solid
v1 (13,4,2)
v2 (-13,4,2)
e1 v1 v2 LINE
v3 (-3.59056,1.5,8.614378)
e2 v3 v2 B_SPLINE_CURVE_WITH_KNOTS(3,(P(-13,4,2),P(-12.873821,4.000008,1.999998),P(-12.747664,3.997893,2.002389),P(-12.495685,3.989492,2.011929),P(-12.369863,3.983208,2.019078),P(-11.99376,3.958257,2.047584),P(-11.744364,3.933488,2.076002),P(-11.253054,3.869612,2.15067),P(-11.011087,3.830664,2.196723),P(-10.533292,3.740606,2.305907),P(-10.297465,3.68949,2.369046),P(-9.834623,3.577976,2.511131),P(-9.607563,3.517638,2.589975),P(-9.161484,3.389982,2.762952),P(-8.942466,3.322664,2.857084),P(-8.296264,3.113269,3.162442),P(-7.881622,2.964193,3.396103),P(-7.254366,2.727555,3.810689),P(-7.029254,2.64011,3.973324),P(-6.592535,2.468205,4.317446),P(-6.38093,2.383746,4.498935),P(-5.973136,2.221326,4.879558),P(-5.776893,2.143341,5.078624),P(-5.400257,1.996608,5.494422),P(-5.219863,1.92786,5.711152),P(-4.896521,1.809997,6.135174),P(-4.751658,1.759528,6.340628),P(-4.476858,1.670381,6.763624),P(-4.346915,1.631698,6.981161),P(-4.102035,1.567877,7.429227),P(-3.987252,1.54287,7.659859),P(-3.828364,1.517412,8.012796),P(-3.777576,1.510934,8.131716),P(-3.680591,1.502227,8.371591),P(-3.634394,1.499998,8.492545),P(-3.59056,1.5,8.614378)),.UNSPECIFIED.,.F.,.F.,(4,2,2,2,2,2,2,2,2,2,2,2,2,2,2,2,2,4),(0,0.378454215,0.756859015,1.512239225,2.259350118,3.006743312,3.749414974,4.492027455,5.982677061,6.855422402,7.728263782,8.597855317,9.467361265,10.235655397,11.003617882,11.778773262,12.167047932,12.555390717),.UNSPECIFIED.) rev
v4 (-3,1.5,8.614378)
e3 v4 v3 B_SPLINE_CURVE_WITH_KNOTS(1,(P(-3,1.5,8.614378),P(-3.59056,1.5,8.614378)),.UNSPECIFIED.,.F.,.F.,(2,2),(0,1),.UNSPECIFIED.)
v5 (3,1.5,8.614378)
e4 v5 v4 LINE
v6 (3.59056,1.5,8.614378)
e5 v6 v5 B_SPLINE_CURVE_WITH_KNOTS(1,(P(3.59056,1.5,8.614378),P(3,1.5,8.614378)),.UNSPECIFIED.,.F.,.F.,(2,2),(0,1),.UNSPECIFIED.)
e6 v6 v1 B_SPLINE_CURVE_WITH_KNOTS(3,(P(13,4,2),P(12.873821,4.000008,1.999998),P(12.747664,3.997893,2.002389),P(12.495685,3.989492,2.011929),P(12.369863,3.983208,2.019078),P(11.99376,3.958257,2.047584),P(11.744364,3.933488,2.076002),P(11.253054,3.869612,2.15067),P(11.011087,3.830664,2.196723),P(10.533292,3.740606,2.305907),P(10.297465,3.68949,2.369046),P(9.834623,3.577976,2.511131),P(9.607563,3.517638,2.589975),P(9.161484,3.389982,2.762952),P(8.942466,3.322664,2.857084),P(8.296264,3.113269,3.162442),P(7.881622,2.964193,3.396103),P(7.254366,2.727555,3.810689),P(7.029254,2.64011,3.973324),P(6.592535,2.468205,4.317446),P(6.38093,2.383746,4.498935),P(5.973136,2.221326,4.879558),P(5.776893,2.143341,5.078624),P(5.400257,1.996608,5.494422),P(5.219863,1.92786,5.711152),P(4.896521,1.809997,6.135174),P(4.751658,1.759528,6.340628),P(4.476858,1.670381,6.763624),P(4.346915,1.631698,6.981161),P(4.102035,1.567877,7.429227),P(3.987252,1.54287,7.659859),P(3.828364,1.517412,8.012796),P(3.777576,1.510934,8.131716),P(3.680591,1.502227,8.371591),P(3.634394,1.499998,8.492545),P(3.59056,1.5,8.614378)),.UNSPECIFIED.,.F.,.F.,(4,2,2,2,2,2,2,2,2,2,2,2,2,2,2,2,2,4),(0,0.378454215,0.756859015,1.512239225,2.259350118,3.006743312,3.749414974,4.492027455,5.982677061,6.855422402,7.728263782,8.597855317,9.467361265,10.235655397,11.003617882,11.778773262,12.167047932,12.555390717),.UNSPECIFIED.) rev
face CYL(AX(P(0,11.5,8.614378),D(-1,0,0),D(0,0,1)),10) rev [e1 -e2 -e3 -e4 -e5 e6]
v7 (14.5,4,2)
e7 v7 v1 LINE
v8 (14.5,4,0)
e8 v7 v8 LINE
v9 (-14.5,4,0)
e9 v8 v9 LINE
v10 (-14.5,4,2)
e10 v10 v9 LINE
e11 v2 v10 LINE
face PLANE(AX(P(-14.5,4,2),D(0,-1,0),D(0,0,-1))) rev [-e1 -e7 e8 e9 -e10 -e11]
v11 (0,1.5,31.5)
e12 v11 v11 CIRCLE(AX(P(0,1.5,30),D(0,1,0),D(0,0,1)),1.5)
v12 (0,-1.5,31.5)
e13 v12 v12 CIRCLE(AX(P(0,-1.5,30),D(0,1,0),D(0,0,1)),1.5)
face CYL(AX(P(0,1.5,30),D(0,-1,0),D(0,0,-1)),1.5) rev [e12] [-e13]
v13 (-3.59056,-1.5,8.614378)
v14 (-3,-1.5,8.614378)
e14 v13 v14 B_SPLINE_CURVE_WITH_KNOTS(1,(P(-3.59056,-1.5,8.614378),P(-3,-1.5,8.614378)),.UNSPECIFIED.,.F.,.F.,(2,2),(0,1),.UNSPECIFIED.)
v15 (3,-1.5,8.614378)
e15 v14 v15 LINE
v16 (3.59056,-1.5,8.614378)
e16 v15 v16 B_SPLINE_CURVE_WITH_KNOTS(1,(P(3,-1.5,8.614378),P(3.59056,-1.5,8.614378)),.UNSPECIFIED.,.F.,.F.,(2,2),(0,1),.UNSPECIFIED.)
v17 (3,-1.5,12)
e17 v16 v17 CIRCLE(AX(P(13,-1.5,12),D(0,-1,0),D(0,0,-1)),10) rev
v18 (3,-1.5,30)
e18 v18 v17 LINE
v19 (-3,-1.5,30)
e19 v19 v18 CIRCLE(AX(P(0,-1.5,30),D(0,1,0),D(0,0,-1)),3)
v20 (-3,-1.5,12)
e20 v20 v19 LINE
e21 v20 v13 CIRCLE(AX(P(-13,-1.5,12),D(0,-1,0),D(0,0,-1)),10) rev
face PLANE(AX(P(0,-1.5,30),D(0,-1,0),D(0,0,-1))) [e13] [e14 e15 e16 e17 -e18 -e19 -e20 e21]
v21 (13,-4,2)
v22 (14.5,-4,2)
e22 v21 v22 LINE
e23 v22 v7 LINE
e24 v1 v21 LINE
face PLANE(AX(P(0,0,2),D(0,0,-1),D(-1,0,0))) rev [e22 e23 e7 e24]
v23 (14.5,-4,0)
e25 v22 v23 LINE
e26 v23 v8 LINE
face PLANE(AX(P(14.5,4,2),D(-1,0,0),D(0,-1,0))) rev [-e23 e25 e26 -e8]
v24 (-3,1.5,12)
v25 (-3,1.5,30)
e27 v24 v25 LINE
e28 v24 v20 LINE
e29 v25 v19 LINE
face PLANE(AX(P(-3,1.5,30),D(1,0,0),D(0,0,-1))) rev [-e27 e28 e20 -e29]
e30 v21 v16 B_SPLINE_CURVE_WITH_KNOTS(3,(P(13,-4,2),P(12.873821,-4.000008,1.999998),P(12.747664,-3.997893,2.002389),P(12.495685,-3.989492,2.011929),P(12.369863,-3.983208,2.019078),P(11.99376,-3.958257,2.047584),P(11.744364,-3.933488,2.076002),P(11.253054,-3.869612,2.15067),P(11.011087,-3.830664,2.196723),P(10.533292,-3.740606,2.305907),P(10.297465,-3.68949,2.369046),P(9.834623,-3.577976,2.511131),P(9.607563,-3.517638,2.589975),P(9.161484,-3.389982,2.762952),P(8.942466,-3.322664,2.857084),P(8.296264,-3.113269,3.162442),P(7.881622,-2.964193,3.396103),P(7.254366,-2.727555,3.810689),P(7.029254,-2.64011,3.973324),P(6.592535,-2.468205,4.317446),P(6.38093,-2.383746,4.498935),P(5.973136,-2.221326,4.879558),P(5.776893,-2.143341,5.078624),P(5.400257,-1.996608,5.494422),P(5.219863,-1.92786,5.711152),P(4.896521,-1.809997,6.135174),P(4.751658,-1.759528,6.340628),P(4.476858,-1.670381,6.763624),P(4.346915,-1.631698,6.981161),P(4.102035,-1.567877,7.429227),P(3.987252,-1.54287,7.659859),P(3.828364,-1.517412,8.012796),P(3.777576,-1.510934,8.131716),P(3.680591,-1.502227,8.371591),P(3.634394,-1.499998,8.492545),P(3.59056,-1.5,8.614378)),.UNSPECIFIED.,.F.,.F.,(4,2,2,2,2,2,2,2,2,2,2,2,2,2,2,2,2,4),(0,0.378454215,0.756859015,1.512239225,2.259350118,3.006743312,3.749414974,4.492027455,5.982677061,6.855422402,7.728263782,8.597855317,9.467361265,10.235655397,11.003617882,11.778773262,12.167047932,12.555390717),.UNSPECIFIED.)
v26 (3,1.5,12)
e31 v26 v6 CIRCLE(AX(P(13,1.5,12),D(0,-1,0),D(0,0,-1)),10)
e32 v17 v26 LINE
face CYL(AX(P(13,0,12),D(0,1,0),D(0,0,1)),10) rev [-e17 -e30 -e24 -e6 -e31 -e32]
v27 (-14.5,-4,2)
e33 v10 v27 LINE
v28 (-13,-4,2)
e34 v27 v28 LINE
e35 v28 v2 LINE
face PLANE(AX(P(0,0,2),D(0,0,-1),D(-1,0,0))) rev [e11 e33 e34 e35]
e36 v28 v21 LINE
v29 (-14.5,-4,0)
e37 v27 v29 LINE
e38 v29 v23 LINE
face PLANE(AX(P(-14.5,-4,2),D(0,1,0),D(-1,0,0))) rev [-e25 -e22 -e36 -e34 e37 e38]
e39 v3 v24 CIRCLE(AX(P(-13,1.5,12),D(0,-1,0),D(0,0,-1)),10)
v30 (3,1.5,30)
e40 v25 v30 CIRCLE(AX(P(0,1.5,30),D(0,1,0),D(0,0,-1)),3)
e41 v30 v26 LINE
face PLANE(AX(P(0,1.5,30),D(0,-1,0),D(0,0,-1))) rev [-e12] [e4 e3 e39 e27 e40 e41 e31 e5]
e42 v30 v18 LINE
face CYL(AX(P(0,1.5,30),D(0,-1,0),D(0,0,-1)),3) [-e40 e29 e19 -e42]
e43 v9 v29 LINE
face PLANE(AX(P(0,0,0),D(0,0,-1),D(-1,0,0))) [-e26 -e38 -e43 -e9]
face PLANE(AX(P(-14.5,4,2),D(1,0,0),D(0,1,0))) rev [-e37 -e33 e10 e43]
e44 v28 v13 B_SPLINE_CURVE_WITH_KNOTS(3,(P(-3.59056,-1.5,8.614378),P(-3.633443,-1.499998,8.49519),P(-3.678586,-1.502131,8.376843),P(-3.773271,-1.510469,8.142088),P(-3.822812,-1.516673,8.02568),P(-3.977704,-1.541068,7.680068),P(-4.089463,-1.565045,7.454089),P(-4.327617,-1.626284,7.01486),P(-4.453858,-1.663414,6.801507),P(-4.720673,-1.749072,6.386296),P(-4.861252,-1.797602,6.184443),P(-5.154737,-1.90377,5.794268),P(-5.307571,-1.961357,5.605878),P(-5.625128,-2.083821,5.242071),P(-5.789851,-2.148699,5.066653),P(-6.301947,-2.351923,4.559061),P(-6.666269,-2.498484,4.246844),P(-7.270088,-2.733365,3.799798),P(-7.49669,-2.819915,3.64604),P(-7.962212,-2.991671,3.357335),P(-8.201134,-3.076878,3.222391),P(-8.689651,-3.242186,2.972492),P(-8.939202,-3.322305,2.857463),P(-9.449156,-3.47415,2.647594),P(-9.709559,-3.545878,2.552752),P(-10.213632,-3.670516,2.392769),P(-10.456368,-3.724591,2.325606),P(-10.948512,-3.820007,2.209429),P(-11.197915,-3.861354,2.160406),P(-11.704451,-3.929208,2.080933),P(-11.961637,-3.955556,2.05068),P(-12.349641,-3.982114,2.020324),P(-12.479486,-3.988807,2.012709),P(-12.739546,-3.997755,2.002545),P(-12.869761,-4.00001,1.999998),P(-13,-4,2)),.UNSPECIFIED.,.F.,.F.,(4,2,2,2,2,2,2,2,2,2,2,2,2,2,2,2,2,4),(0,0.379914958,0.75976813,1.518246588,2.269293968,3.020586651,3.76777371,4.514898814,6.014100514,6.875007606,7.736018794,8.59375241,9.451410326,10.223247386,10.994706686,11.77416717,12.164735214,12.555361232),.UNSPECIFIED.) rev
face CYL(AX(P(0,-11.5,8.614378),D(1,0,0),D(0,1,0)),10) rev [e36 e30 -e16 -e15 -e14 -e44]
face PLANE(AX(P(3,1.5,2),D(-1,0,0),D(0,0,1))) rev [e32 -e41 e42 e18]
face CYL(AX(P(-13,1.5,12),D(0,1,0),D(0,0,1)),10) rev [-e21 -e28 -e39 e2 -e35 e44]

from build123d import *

# Parameters (mm, degrees)
SKETCH1_W           = 29
SKETCH1_H           = 8
BOSS_EXTRUDE1_DEPTH = 2
SKETCH2_R           = 1.5
BOSS_EXTRUDE2_DEPTH = 1.5
FILLET1_R           = 10


with BuildPart() as part:
    # Sketch1 → Boss-Extrude1 (new body)
    with BuildSketch(Plane.XY):
        Rectangle(SKETCH1_W, SKETCH1_H)
    extrude(amount=BOSS_EXTRUDE1_DEPTH)

    # Sketch2 → Boss-Extrude2 (add, symmetric)
    with BuildSketch(Plane(origin=(0, 0, 0), x_dir=(1, 0, 0), z_dir=(0, 1, 0))):
        with BuildLine():
            Line((-3, -2), (3, -2))
            Line((3, -2), (3, -30))
            ThreePointArc((3, -30), (0, -33), (-3, -30))
            Line((-3, -30), (-3, -2))
        make_face()
        with Locations(Location((0, -30, 0), (0, 0, 270))):
            Circle(SKETCH2_R, mode=Mode.SUBTRACT)
    extrude(amount=BOSS_EXTRUDE2_DEPTH, both=True)

    # Fillet1
    # the kernel refuses this fillet: 10 mm, written as the material it adds along each edge
    with BuildSketch(Plane(origin=(-3, 1.5, 2), x_dir=(0, 1, 0), z_dir=(1, 0, 0))) as fillet1_piece_1:
        with BuildLine():
            CenterArc((10, 6.614378278), FILLET1_R, 180, 41.409622109)
            Line((0, 6.614378278), (-0.2, 6.614378278))
            Line((-0.2, 6.614378278), (-0.2, 0))
            Line((-0.2, 0), (0, -0.2))
            ThreePointArc((0, -0.2), (1.25, -0.2), (2.35, -0.132287566))
            Line((2.35, -0.132287566), (2.5, 0))
        make_face()
    extrude(amount=6)
    with BuildSketch(Plane(origin=(-3, -1.5, 2), x_dir=(-1, 0, 0), z_dir=(0, 1, 0)), Plane(origin=(3, 1.5, 2), x_dir=(1, 0, 0), z_dir=(0, -1, 0))) as fillet1_piece_2:
        with BuildLine():
            CenterArc((FILLET1_R, FILLET1_R), FILLET1_R, 180, 90)
            Line((0, FILLET1_R), (-FILLET1_R * 0.02, FILLET1_R))
            Line((-FILLET1_R * 0.02, FILLET1_R), (-FILLET1_R * 0.02, -FILLET1_R * 0.02))
            Line((-FILLET1_R * 0.02, -FILLET1_R * 0.02), (FILLET1_R, -FILLET1_R * 0.02))
            Line((FILLET1_R, -FILLET1_R * 0.02), (FILLET1_R, 0))
        make_face()
    extrude(amount=3)
    with BuildSketch(Plane(origin=(-3, -1.5, 2), x_dir=(0, -1, 0), z_dir=(1, 0, 0))) as fillet1_piece_3:
        with BuildLine():
            CenterArc((10, -6.614378278), FILLET1_R, 138.590377891, 41.409622109)
            Line((0, -6.614378278), (-0.2, -6.614378278))
            Line((-0.2, -6.614378278), (-0.2, 0))
            Line((-0.2, 0), (0, 0.2))
            ThreePointArc((0, 0.2), (1.25, 0.2), (2.35, 0.132287566))
            Line((2.35, 0.132287566), (2.5, 0))
        make_face()
    extrude(amount=6)
    with BuildSketch(Plane(origin=(-19.535945694, 1.5, 2), x_dir=(0, 1, 0), z_dir=(1, 0, 0))) as fillet1_piece_4a_section:
        with BuildLine():
            CenterArc((10, 6.614378278), FILLET1_R, 180, 41.409622109)
            Line((0, 6.614378278), (-0.2, 6.614378278))
            Line((-0.2, 6.614378278), (-0.2, 0))
            Line((-0.2, 0), (0, -0.2))
            ThreePointArc((0, -0.2), (1.25, -0.2), (2.35, -0.132287566))
            Line((2.35, -0.132287566), (2.5, 0))
        make_face()
    fillet1_piece_4a = extrude(amount=22.535945694, mode=Mode.PRIVATE)
    fillet1_piece_4a = split(fillet1_piece_4a, bisect_by=Plane(origin=(-14.5, 2.097749904, 3.814075663), z_dir=(1, 0, 0)), keep=Keep.TOP, mode=Mode.PRIVATE)
    fillet1_piece_4a = split(fillet1_piece_4a, bisect_by=Plane(origin=(-3, 2.097749904, 3.814075663), z_dir=(-1, 0, 0)), keep=Keep.TOP, mode=Mode.PRIVATE)
    with BuildSketch(Plane(origin=(-3, -1.5, 2), x_dir=(-1, 0, 0), z_dir=(0, 1, 0))) as fillet1_piece_4b_section:
        with BuildLine():
            CenterArc((FILLET1_R, FILLET1_R), FILLET1_R, 180, 90)
            Line((0, FILLET1_R), (-FILLET1_R * 0.02, FILLET1_R))
            Line((-FILLET1_R * 0.02, FILLET1_R), (-FILLET1_R * 0.02, -FILLET1_R * 0.02))
            Line((-FILLET1_R * 0.02, -FILLET1_R * 0.02), (FILLET1_R, -FILLET1_R * 0.02))
            Line((FILLET1_R, -FILLET1_R * 0.02), (FILLET1_R, 0))
        make_face()
    fillet1_piece_4b = extrude(amount=28, mode=Mode.PRIVATE)
    fillet1_piece_4b = split(fillet1_piece_4b, bisect_by=Plane(origin=(-5.263951143, 4, 4.263951143), z_dir=(0, -1, 0)), keep=Keep.TOP, mode=Mode.PRIVATE)
    fillet1_piece_4b = split(fillet1_piece_4b, bisect_by=Plane(origin=(-5.263951143, 1.5, 4.263951143), z_dir=(0, 1, 0)), keep=Keep.TOP, mode=Mode.PRIVATE)
    fillet1_piece_4 = fillet1_piece_4a & fillet1_piece_4b
    add(fillet1_piece_4)
    with BuildSketch(Plane(origin=(3, 26.5, 2), x_dir=(1, 0, 0), z_dir=(0, -1, 0))) as fillet1_piece_5a_section:
        with BuildLine():
            CenterArc((FILLET1_R, FILLET1_R), FILLET1_R, 180, 90)
            Line((0, FILLET1_R), (-FILLET1_R * 0.02, FILLET1_R))
            Line((-FILLET1_R * 0.02, FILLET1_R), (-FILLET1_R * 0.02, -FILLET1_R * 0.02))
            Line((-FILLET1_R * 0.02, -FILLET1_R * 0.02), (FILLET1_R, -FILLET1_R * 0.02))
            Line((FILLET1_R, -FILLET1_R * 0.02), (FILLET1_R, 0))
        make_face()
    fillet1_piece_5a = extrude(amount=28, mode=Mode.PRIVATE)
    fillet1_piece_5a = split(fillet1_piece_5a, bisect_by=Plane(origin=(5.263951143, 4, 4.263951143), z_dir=(0, -1, 0)), keep=Keep.TOP, mode=Mode.PRIVATE)
    fillet1_piece_5a = split(fillet1_piece_5a, bisect_by=Plane(origin=(5.263951143, 1.5, 4.263951143), z_dir=(0, 1, 0)), keep=Keep.TOP, mode=Mode.PRIVATE)
    with BuildSketch(Plane(origin=(-3, 1.5, 2), x_dir=(0, 1, 0), z_dir=(1, 0, 0))) as fillet1_piece_5b_section:
        with BuildLine():
            CenterArc((10, 6.614378278), FILLET1_R, 180, 41.409622109)
            Line((0, 6.614378278), (-0.2, 6.614378278))
            Line((-0.2, 6.614378278), (-0.2, 0))
            Line((-0.2, 0), (0, -0.2))
            ThreePointArc((0, -0.2), (1.25, -0.2), (2.35, -0.132287566))
            Line((2.35, -0.132287566), (2.5, 0))
        make_face()
    fillet1_piece_5b = extrude(amount=22.535945694, mode=Mode.PRIVATE)
    fillet1_piece_5b = split(fillet1_piece_5b, bisect_by=Plane(origin=(14.5, 2.097749904, 3.814075663), z_dir=(-1, 0, 0)), keep=Keep.TOP, mode=Mode.PRIVATE)
    fillet1_piece_5b = split(fillet1_piece_5b, bisect_by=Plane(origin=(3, 2.097749904, 3.814075663), z_dir=(1, 0, 0)), keep=Keep.TOP, mode=Mode.PRIVATE)
    fillet1_piece_5 = fillet1_piece_5a & fillet1_piece_5b
    add(fillet1_piece_5)
    with BuildSketch(Plane(origin=(-19.535945694, -1.5, 2), x_dir=(0, -1, 0), z_dir=(1, 0, 0))) as fillet1_piece_6a_section:
        with BuildLine():
            CenterArc((10, -6.614378278), FILLET1_R, 138.590377891, 41.409622109)
            Line((0, -6.614378278), (-0.2, -6.614378278))
            Line((-0.2, -6.614378278), (-0.2, 0))
            Line((-0.2, 0), (0, 0.2))
            ThreePointArc((0, 0.2), (1.25, 0.2), (2.35, 0.132287566))
            Line((2.35, 0.132287566), (2.5, 0))
        make_face()
    fillet1_piece_6a = extrude(amount=22.535945694, mode=Mode.PRIVATE)
    fillet1_piece_6a = split(fillet1_piece_6a, bisect_by=Plane(origin=(-14.5, -2.097749904, 3.814075663), z_dir=(1, 0, 0)), keep=Keep.TOP, mode=Mode.PRIVATE)
    fillet1_piece_6a = split(fillet1_piece_6a, bisect_by=Plane(origin=(-3, -2.097749904, 3.814075663), z_dir=(-1, 0, 0)), keep=Keep.TOP, mode=Mode.PRIVATE)
    with BuildSketch(Plane(origin=(-3, -26.5, 2), x_dir=(-1, 0, 0), z_dir=(0, 1, 0))) as fillet1_piece_6b_section:
        with BuildLine():
            CenterArc((FILLET1_R, FILLET1_R), FILLET1_R, 180, 90)
            Line((0, FILLET1_R), (-FILLET1_R * 0.02, FILLET1_R))
            Line((-FILLET1_R * 0.02, FILLET1_R), (-FILLET1_R * 0.02, -FILLET1_R * 0.02))
            Line((-FILLET1_R * 0.02, -FILLET1_R * 0.02), (FILLET1_R, -FILLET1_R * 0.02))
            Line((FILLET1_R, -FILLET1_R * 0.02), (FILLET1_R, 0))
        make_face()
    fillet1_piece_6b = extrude(amount=28, mode=Mode.PRIVATE)
    fillet1_piece_6b = split(fillet1_piece_6b, bisect_by=Plane(origin=(-5.263951143, -4, 4.263951143), z_dir=(0, 1, 0)), keep=Keep.TOP, mode=Mode.PRIVATE)
    fillet1_piece_6b = split(fillet1_piece_6b, bisect_by=Plane(origin=(-5.263951143, -1.5, 4.263951143), z_dir=(0, -1, 0)), keep=Keep.TOP, mode=Mode.PRIVATE)
    fillet1_piece_6 = fillet1_piece_6a & fillet1_piece_6b
    add(fillet1_piece_6)
    with BuildSketch(Plane(origin=(-3, -1.5, 2), x_dir=(0, -1, 0), z_dir=(1, 0, 0))) as fillet1_piece_7a_section:
        with BuildLine():
            CenterArc((10, -6.614378278), FILLET1_R, 138.590377891, 41.409622109)
            Line((0, -6.614378278), (-0.2, -6.614378278))
            Line((-0.2, -6.614378278), (-0.2, 0))
            Line((-0.2, 0), (0, 0.2))
            ThreePointArc((0, 0.2), (1.25, 0.2), (2.35, 0.132287566))
            Line((2.35, 0.132287566), (2.5, 0))
        make_face()
    fillet1_piece_7a = extrude(amount=22.535945694, mode=Mode.PRIVATE)
    fillet1_piece_7a = split(fillet1_piece_7a, bisect_by=Plane(origin=(14.5, -2.097749904, 3.814075663), z_dir=(-1, 0, 0)), keep=Keep.TOP, mode=Mode.PRIVATE)
    fillet1_piece_7a = split(fillet1_piece_7a, bisect_by=Plane(origin=(3, -2.097749904, 3.814075663), z_dir=(1, 0, 0)), keep=Keep.TOP, mode=Mode.PRIVATE)
    with BuildSketch(Plane(origin=(3, 1.5, 2), x_dir=(1, 0, 0), z_dir=(0, -1, 0))) as fillet1_piece_7b_section:
        with BuildLine():
            CenterArc((FILLET1_R, FILLET1_R), FILLET1_R, 180, 90)
            Line((0, FILLET1_R), (-FILLET1_R * 0.02, FILLET1_R))
            Line((-FILLET1_R * 0.02, FILLET1_R), (-FILLET1_R * 0.02, -FILLET1_R * 0.02))
            Line((-FILLET1_R * 0.02, -FILLET1_R * 0.02), (FILLET1_R, -FILLET1_R * 0.02))
            Line((FILLET1_R, -FILLET1_R * 0.02), (FILLET1_R, 0))
        make_face()
    fillet1_piece_7b = extrude(amount=28, mode=Mode.PRIVATE)
    fillet1_piece_7b = split(fillet1_piece_7b, bisect_by=Plane(origin=(5.263951143, -4, 4.263951143), z_dir=(0, 1, 0)), keep=Keep.TOP, mode=Mode.PRIVATE)
    fillet1_piece_7b = split(fillet1_piece_7b, bisect_by=Plane(origin=(5.263951143, -1.5, 4.263951143), z_dir=(0, -1, 0)), keep=Keep.TOP, mode=Mode.PRIVATE)
    fillet1_piece_7 = fillet1_piece_7a & fillet1_piece_7b
    add(fillet1_piece_7)


solid = part.part
